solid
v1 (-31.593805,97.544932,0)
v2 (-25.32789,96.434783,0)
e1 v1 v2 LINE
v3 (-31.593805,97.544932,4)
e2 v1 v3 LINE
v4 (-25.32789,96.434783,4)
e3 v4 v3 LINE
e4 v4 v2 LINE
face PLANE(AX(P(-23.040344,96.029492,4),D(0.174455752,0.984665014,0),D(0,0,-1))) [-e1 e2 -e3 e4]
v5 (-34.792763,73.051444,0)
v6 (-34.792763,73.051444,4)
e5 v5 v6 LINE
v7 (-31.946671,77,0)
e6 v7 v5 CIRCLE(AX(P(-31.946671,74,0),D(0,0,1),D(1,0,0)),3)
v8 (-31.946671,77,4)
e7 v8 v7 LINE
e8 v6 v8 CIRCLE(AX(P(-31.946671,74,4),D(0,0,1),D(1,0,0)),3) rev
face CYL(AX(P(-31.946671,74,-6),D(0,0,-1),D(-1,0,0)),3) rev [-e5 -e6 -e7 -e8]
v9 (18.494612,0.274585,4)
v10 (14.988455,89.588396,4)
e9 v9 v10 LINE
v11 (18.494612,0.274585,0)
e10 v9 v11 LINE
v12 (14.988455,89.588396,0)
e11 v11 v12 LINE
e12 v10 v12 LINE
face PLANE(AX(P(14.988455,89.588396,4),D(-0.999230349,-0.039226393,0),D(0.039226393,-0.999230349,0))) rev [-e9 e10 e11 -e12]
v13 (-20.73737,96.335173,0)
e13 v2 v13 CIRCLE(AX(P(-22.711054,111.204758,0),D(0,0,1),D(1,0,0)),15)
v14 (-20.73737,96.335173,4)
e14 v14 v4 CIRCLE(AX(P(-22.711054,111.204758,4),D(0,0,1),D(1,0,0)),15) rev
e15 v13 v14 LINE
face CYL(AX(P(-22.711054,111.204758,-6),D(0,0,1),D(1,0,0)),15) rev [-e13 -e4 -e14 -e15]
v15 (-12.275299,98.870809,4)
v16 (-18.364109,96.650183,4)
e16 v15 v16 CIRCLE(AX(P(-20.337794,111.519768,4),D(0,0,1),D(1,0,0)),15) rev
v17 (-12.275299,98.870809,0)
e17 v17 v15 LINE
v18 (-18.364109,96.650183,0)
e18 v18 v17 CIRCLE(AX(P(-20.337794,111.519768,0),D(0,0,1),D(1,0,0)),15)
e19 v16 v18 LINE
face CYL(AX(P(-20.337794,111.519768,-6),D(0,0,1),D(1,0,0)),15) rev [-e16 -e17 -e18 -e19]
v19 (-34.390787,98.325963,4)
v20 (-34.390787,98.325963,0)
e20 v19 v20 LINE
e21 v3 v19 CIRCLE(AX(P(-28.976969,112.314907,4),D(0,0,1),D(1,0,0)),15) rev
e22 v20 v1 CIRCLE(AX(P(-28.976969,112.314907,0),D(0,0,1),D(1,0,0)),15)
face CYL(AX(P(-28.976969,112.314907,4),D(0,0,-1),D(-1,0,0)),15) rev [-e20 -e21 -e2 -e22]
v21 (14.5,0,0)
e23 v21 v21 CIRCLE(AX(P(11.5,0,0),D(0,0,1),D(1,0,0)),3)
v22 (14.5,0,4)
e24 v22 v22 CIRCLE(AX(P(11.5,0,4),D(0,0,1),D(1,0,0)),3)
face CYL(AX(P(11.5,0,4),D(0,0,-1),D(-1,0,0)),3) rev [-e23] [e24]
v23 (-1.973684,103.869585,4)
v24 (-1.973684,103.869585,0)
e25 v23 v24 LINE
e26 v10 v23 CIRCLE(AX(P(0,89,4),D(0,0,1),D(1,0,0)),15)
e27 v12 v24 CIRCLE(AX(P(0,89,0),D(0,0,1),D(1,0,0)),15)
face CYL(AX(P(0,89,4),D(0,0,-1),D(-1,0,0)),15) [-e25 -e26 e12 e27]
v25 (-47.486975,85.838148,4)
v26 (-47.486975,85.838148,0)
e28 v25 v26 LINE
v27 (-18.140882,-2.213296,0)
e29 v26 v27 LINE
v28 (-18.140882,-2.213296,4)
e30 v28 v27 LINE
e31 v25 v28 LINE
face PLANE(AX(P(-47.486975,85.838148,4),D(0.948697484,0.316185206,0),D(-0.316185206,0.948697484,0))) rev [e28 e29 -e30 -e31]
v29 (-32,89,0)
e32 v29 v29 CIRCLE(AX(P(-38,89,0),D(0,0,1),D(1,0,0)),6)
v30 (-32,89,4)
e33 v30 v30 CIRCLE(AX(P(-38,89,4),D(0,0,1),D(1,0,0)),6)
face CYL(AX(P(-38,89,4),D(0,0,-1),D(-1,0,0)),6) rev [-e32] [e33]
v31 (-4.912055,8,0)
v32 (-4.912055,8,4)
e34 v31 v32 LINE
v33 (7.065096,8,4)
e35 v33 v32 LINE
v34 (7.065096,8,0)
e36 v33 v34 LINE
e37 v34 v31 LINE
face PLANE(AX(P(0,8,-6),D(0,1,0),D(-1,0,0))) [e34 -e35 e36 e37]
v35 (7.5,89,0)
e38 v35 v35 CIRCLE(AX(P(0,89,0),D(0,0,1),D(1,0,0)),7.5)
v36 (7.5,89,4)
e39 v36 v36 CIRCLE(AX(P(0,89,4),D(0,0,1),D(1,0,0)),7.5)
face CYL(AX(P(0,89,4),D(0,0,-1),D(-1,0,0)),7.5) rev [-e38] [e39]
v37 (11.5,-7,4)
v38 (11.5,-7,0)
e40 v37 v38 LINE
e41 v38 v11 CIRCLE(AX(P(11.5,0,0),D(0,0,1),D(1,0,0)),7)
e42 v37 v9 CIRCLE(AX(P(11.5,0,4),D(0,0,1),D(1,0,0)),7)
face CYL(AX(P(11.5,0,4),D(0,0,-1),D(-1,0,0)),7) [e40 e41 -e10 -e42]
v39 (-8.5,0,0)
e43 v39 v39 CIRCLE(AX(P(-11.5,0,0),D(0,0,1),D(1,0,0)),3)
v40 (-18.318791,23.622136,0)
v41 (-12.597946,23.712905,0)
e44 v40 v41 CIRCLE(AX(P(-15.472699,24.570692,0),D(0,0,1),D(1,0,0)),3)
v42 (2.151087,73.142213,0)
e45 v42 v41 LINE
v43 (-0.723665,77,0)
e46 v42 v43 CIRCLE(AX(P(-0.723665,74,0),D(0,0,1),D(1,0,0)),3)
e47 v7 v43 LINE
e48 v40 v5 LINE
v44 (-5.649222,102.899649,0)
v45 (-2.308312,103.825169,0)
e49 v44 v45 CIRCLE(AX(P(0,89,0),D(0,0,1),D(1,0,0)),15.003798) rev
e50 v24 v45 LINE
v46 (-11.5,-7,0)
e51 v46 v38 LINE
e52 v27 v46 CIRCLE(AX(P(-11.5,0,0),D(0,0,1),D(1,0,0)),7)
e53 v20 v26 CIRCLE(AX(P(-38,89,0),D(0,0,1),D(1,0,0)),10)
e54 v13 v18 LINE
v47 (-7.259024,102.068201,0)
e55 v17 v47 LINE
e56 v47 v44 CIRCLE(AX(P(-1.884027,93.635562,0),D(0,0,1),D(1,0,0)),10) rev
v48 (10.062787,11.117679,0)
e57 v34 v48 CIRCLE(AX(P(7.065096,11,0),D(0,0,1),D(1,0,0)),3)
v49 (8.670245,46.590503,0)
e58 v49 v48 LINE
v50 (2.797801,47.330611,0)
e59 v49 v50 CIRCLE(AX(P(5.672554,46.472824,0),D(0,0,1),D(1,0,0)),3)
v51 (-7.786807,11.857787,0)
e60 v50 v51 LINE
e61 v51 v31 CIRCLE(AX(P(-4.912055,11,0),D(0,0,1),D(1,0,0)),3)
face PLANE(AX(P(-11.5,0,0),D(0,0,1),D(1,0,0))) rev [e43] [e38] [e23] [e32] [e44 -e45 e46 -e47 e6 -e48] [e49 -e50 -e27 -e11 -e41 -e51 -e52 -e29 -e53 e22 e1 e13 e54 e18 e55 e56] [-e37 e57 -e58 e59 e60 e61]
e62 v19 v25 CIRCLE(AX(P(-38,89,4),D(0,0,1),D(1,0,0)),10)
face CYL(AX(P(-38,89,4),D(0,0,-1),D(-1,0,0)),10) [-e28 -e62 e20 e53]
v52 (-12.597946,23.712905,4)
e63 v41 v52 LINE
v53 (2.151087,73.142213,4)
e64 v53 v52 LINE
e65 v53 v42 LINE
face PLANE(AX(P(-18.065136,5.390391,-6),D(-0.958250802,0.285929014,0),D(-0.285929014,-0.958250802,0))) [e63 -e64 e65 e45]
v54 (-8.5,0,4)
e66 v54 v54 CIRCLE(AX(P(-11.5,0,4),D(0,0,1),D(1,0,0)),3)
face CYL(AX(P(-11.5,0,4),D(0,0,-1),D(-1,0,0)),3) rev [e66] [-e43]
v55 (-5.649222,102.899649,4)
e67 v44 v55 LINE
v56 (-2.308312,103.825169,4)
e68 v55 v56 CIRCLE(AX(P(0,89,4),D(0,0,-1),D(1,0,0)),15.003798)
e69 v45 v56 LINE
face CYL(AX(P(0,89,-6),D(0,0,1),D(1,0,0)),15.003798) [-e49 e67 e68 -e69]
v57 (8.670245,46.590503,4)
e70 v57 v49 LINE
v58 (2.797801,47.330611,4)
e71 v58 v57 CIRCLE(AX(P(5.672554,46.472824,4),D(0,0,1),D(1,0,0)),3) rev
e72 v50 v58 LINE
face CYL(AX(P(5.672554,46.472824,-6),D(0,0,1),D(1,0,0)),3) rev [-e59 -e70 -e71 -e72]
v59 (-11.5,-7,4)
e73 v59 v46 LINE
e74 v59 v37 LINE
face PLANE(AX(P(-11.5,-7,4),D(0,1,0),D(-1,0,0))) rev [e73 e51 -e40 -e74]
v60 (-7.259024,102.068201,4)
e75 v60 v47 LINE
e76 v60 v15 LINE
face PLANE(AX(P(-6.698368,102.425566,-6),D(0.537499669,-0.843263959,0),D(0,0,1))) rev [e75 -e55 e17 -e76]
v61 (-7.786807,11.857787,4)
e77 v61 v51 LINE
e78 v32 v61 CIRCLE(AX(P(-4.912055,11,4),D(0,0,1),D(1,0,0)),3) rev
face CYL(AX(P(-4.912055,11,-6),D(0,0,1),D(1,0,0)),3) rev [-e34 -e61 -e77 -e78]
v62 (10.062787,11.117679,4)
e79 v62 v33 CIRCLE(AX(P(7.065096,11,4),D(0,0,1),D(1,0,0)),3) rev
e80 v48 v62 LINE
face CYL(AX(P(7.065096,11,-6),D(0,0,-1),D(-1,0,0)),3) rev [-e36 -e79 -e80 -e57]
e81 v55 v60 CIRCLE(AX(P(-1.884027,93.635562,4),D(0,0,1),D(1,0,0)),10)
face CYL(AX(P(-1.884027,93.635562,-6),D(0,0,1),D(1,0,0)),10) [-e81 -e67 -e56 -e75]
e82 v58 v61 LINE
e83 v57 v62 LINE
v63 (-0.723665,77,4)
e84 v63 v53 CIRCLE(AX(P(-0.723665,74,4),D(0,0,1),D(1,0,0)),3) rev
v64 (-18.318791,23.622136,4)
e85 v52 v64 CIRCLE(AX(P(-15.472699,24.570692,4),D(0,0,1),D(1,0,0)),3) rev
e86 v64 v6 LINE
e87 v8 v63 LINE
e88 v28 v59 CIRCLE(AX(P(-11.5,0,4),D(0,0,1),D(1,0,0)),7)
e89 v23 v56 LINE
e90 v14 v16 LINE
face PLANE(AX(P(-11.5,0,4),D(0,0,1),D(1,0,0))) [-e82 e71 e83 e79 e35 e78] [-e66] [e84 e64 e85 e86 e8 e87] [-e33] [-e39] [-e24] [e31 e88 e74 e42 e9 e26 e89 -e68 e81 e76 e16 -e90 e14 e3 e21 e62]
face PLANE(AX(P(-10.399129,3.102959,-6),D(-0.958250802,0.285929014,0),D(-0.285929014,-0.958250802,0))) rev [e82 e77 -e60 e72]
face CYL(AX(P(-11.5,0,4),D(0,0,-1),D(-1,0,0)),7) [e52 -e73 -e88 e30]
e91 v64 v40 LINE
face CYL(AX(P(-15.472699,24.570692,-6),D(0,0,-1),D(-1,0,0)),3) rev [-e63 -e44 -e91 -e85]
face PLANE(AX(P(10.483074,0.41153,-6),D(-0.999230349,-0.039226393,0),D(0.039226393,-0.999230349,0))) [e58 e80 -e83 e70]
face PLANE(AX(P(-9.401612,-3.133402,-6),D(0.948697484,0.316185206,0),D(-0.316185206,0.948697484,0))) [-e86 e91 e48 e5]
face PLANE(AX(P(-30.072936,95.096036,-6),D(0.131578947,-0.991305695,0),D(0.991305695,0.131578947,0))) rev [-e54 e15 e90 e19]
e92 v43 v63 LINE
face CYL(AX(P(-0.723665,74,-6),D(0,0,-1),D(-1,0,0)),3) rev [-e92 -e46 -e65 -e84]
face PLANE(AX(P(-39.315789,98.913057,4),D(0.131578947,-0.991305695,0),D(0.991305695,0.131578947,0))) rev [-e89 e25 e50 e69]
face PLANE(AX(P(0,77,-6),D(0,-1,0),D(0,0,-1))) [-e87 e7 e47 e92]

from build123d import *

# Parameters (mm, degrees)
SKETCH_1_R            = 3
SKETCH_1_R_2          = 7.5
SKETCH_1_R_3          = 6
EXTRUDE_1_DEPTH       = 4
CUT_EXTRUDE_START     = -10
CUT_EXTRUDE_2_DEPTH   = 10
CHAMFER_START         = -90.054290201
CHAMFER_2_OUTLINE_W   = 9.93243638
CHAMFER_2_OUTLINE_H   = 4
CHAMFER_2_DEPTH       = 0.082131492
CHAMFER_START_2       = -89.972158709
CHAMFER_2_2_OUTLINE_W = 9.93243638
CHAMFER_2_2_OUTLINE_H = 4
CHAMFER_2_2_DEPTH     = 1.179418362
FILLET_4_R            = 15
FILLET_5_R            = 10
CUT_EXTRUDE_6_DEPTH   = 10
FILLET_8_R            = 3


with BuildPart() as part:
    # 草图1 → 凸台-拉伸1 (new body)
    with BuildSketch(Plane.XY):
        with BuildLine():
            Line((-47.486974837, 85.838147942), (-18.140882386, -2.213296441))
            ThreePointArc((-18.140882386, -2.213296441), (-15.593099371, -5.678603485), (-11.5, -7))
            Line((-11.5, -7), (11.5, -7))
            ThreePointArc((11.5, -7), (16.545894038, -4.851695926), (18.494612442, 0.274584754))
            Line((18.494612442, 0.274584754), (14.988455233, 89.588395901))
            ThreePointArc((14.988455233, 89.588395901), (9.660960601, 100.474573642), (-1.973684211, 103.869585423))
            Line((-1.973684211, 103.869585423), (-39.315789474, 98.913056948))
            ThreePointArc((-39.315789474, 98.913056948), (-46.480167485, 94.299694277), (-47.486974837, 85.838147942))
        make_face()
        with Locations((11.5, 0)):
            Circle(SKETCH_1_R, mode=Mode.SUBTRACT)
        with Locations((-11.5, 0)):
            Circle(SKETCH_1_R, mode=Mode.SUBTRACT)
        with Locations((0, 89)):
            Circle(SKETCH_1_R_2, mode=Mode.SUBTRACT)
        with Locations((-38, 89)):
            Circle(SKETCH_1_R_3, mode=Mode.SUBTRACT)
    extrude(amount=EXTRUDE_1_DEPTH)

    # 草图3 → 切除-拉伸2 (cut)
    with BuildSketch(Plane.XY.offset(4).offset(CUT_EXTRUDE_START)):
        with BuildLine():
            Line((-30.07293559, 95.096035584), (-12.403974557, 97.441289229))
            ThreePointArc((-12.403974557, 97.441289229), (-8.018810771, 101.681191682), (-2.308312161, 103.825169261))
            Line((-2.308312161, 103.825169261), (-39.315789474, 98.913056948))
            ThreePointArc((-39.315789474, 98.913056948), (-34.182978636, 98.242853883), (-30.07293559, 95.096035584))
        make_face()
    extrude(amount=CUT_EXTRUDE_2_DEPTH, mode=Mode.SUBTRACT)

    # 倒角1
    # the kernel refuses this chamfer: 10 mm, written as the material it adds along each edge
    with BuildSketch(Plane(origin=(-30.07293559, 95.096035584, 0), x_dir=(-0.7655170404951253, 0.6434156205063604, 0), z_dir=(0, 0, 1))) as chamfer_1_piece_1:
        with BuildLine():
            Line((4.638446898, 0.2), (-5.12937843, -5.439456583))
            Line((-5.12937843, -5.439456583), (-5.277087929, -5.304616293))
            ThreePointArc((-5.277087929, -5.304616293), (-2.667716566, -2.625677211), (-0.147709499, 0.13484029))
            Line((-0.147709499, 0.13484029), (0.042920367, 0.195340324))
            ThreePointArc((0.042920367, 0.195340324), (2.321577959, -0.03141118), (4.595526531, 0.395340324))
            Line((4.595526531, 0.395340324), (4.638446898, 0.2))
        make_face()
    extrude(amount=4)

    # 倒角2: read off the stored shape, not the designer's step
    # 倒角2 outline → 倒角2 (cut)
    with BuildSketch(Plane(origin=(0, 0, 0), x_dir=(0.8432639594677478, 0.5374996694536441, 0), z_dir=(0.537499669453644, -0.8432639594677479, 0)).offset(CHAMFER_START)):
        with Locations((44.438996955, 2)):
            Rectangle(CHAMFER_2_OUTLINE_W, CHAMFER_2_OUTLINE_H)
    extrude(amount=CHAMFER_2_DEPTH, mode=Mode.SUBTRACT)

    # Chamfer 2 2 outline → Chamfer 2 2 (add)
    with BuildSketch(Plane(origin=(0, 0, 0), x_dir=(0.8432639594677478, 0.5374996694536441, 0), z_dir=(0.537499669453644, -0.8432639594677479, 0)).offset(CHAMFER_START_2)):
        with Locations((44.438996955, 2)):
            Rectangle(CHAMFER_2_2_OUTLINE_W, CHAMFER_2_2_OUTLINE_H)
    extrude(amount=CHAMFER_2_2_DEPTH)

    # 圆角4
    fillet_4_edges = [part.edges().sort_by_distance(p)[0] for p in [
        (-23.040343668, 96.029492385, 2),
        (-33.358562851, 97.857599065, 2),
        (-15.074033854, 97.086884333, 2),
    ]]
    fillet(fillet_4_edges, radius=FILLET_4_R)

    # 圆角5
    fillet_5_edges = [part.edges().sort_by_distance(p)[0] for p in [
        (-6.698368225, 102.425565605, 2),
    ]]
    fillet(fillet_5_edges, radius=FILLET_5_R)

    # 草图7 → 切除-拉伸6 (cut)
    with BuildSketch(Plane.XY.offset(4)):
        Polygon((3.302198464, 77), (-36.108751735, 77), (-15.314632791, 14.608313246), align=None)
        Polygon((10.185176898, 8), (7.961799494, 64.637023864), (-8.937918575, 8), align=None)
    extrude(amount=-CUT_EXTRUDE_6_DEPTH, mode=Mode.SUBTRACT)

    # 圆角8
    fillet_8_edges = [part.edges().sort_by_distance(p)[0] for p in [
        (7.961799494, 64.637023864, 2),
        (10.185176898, 8, 2),
        (-8.937918575, 8, 2),
        (3.302198464, 77, 2),
        (-15.314632791, 14.608313246, 2),
        (-36.108751735, 77, 2),
    ]]
    fillet(fillet_8_edges, radius=FILLET_8_R)


solid = part.part
